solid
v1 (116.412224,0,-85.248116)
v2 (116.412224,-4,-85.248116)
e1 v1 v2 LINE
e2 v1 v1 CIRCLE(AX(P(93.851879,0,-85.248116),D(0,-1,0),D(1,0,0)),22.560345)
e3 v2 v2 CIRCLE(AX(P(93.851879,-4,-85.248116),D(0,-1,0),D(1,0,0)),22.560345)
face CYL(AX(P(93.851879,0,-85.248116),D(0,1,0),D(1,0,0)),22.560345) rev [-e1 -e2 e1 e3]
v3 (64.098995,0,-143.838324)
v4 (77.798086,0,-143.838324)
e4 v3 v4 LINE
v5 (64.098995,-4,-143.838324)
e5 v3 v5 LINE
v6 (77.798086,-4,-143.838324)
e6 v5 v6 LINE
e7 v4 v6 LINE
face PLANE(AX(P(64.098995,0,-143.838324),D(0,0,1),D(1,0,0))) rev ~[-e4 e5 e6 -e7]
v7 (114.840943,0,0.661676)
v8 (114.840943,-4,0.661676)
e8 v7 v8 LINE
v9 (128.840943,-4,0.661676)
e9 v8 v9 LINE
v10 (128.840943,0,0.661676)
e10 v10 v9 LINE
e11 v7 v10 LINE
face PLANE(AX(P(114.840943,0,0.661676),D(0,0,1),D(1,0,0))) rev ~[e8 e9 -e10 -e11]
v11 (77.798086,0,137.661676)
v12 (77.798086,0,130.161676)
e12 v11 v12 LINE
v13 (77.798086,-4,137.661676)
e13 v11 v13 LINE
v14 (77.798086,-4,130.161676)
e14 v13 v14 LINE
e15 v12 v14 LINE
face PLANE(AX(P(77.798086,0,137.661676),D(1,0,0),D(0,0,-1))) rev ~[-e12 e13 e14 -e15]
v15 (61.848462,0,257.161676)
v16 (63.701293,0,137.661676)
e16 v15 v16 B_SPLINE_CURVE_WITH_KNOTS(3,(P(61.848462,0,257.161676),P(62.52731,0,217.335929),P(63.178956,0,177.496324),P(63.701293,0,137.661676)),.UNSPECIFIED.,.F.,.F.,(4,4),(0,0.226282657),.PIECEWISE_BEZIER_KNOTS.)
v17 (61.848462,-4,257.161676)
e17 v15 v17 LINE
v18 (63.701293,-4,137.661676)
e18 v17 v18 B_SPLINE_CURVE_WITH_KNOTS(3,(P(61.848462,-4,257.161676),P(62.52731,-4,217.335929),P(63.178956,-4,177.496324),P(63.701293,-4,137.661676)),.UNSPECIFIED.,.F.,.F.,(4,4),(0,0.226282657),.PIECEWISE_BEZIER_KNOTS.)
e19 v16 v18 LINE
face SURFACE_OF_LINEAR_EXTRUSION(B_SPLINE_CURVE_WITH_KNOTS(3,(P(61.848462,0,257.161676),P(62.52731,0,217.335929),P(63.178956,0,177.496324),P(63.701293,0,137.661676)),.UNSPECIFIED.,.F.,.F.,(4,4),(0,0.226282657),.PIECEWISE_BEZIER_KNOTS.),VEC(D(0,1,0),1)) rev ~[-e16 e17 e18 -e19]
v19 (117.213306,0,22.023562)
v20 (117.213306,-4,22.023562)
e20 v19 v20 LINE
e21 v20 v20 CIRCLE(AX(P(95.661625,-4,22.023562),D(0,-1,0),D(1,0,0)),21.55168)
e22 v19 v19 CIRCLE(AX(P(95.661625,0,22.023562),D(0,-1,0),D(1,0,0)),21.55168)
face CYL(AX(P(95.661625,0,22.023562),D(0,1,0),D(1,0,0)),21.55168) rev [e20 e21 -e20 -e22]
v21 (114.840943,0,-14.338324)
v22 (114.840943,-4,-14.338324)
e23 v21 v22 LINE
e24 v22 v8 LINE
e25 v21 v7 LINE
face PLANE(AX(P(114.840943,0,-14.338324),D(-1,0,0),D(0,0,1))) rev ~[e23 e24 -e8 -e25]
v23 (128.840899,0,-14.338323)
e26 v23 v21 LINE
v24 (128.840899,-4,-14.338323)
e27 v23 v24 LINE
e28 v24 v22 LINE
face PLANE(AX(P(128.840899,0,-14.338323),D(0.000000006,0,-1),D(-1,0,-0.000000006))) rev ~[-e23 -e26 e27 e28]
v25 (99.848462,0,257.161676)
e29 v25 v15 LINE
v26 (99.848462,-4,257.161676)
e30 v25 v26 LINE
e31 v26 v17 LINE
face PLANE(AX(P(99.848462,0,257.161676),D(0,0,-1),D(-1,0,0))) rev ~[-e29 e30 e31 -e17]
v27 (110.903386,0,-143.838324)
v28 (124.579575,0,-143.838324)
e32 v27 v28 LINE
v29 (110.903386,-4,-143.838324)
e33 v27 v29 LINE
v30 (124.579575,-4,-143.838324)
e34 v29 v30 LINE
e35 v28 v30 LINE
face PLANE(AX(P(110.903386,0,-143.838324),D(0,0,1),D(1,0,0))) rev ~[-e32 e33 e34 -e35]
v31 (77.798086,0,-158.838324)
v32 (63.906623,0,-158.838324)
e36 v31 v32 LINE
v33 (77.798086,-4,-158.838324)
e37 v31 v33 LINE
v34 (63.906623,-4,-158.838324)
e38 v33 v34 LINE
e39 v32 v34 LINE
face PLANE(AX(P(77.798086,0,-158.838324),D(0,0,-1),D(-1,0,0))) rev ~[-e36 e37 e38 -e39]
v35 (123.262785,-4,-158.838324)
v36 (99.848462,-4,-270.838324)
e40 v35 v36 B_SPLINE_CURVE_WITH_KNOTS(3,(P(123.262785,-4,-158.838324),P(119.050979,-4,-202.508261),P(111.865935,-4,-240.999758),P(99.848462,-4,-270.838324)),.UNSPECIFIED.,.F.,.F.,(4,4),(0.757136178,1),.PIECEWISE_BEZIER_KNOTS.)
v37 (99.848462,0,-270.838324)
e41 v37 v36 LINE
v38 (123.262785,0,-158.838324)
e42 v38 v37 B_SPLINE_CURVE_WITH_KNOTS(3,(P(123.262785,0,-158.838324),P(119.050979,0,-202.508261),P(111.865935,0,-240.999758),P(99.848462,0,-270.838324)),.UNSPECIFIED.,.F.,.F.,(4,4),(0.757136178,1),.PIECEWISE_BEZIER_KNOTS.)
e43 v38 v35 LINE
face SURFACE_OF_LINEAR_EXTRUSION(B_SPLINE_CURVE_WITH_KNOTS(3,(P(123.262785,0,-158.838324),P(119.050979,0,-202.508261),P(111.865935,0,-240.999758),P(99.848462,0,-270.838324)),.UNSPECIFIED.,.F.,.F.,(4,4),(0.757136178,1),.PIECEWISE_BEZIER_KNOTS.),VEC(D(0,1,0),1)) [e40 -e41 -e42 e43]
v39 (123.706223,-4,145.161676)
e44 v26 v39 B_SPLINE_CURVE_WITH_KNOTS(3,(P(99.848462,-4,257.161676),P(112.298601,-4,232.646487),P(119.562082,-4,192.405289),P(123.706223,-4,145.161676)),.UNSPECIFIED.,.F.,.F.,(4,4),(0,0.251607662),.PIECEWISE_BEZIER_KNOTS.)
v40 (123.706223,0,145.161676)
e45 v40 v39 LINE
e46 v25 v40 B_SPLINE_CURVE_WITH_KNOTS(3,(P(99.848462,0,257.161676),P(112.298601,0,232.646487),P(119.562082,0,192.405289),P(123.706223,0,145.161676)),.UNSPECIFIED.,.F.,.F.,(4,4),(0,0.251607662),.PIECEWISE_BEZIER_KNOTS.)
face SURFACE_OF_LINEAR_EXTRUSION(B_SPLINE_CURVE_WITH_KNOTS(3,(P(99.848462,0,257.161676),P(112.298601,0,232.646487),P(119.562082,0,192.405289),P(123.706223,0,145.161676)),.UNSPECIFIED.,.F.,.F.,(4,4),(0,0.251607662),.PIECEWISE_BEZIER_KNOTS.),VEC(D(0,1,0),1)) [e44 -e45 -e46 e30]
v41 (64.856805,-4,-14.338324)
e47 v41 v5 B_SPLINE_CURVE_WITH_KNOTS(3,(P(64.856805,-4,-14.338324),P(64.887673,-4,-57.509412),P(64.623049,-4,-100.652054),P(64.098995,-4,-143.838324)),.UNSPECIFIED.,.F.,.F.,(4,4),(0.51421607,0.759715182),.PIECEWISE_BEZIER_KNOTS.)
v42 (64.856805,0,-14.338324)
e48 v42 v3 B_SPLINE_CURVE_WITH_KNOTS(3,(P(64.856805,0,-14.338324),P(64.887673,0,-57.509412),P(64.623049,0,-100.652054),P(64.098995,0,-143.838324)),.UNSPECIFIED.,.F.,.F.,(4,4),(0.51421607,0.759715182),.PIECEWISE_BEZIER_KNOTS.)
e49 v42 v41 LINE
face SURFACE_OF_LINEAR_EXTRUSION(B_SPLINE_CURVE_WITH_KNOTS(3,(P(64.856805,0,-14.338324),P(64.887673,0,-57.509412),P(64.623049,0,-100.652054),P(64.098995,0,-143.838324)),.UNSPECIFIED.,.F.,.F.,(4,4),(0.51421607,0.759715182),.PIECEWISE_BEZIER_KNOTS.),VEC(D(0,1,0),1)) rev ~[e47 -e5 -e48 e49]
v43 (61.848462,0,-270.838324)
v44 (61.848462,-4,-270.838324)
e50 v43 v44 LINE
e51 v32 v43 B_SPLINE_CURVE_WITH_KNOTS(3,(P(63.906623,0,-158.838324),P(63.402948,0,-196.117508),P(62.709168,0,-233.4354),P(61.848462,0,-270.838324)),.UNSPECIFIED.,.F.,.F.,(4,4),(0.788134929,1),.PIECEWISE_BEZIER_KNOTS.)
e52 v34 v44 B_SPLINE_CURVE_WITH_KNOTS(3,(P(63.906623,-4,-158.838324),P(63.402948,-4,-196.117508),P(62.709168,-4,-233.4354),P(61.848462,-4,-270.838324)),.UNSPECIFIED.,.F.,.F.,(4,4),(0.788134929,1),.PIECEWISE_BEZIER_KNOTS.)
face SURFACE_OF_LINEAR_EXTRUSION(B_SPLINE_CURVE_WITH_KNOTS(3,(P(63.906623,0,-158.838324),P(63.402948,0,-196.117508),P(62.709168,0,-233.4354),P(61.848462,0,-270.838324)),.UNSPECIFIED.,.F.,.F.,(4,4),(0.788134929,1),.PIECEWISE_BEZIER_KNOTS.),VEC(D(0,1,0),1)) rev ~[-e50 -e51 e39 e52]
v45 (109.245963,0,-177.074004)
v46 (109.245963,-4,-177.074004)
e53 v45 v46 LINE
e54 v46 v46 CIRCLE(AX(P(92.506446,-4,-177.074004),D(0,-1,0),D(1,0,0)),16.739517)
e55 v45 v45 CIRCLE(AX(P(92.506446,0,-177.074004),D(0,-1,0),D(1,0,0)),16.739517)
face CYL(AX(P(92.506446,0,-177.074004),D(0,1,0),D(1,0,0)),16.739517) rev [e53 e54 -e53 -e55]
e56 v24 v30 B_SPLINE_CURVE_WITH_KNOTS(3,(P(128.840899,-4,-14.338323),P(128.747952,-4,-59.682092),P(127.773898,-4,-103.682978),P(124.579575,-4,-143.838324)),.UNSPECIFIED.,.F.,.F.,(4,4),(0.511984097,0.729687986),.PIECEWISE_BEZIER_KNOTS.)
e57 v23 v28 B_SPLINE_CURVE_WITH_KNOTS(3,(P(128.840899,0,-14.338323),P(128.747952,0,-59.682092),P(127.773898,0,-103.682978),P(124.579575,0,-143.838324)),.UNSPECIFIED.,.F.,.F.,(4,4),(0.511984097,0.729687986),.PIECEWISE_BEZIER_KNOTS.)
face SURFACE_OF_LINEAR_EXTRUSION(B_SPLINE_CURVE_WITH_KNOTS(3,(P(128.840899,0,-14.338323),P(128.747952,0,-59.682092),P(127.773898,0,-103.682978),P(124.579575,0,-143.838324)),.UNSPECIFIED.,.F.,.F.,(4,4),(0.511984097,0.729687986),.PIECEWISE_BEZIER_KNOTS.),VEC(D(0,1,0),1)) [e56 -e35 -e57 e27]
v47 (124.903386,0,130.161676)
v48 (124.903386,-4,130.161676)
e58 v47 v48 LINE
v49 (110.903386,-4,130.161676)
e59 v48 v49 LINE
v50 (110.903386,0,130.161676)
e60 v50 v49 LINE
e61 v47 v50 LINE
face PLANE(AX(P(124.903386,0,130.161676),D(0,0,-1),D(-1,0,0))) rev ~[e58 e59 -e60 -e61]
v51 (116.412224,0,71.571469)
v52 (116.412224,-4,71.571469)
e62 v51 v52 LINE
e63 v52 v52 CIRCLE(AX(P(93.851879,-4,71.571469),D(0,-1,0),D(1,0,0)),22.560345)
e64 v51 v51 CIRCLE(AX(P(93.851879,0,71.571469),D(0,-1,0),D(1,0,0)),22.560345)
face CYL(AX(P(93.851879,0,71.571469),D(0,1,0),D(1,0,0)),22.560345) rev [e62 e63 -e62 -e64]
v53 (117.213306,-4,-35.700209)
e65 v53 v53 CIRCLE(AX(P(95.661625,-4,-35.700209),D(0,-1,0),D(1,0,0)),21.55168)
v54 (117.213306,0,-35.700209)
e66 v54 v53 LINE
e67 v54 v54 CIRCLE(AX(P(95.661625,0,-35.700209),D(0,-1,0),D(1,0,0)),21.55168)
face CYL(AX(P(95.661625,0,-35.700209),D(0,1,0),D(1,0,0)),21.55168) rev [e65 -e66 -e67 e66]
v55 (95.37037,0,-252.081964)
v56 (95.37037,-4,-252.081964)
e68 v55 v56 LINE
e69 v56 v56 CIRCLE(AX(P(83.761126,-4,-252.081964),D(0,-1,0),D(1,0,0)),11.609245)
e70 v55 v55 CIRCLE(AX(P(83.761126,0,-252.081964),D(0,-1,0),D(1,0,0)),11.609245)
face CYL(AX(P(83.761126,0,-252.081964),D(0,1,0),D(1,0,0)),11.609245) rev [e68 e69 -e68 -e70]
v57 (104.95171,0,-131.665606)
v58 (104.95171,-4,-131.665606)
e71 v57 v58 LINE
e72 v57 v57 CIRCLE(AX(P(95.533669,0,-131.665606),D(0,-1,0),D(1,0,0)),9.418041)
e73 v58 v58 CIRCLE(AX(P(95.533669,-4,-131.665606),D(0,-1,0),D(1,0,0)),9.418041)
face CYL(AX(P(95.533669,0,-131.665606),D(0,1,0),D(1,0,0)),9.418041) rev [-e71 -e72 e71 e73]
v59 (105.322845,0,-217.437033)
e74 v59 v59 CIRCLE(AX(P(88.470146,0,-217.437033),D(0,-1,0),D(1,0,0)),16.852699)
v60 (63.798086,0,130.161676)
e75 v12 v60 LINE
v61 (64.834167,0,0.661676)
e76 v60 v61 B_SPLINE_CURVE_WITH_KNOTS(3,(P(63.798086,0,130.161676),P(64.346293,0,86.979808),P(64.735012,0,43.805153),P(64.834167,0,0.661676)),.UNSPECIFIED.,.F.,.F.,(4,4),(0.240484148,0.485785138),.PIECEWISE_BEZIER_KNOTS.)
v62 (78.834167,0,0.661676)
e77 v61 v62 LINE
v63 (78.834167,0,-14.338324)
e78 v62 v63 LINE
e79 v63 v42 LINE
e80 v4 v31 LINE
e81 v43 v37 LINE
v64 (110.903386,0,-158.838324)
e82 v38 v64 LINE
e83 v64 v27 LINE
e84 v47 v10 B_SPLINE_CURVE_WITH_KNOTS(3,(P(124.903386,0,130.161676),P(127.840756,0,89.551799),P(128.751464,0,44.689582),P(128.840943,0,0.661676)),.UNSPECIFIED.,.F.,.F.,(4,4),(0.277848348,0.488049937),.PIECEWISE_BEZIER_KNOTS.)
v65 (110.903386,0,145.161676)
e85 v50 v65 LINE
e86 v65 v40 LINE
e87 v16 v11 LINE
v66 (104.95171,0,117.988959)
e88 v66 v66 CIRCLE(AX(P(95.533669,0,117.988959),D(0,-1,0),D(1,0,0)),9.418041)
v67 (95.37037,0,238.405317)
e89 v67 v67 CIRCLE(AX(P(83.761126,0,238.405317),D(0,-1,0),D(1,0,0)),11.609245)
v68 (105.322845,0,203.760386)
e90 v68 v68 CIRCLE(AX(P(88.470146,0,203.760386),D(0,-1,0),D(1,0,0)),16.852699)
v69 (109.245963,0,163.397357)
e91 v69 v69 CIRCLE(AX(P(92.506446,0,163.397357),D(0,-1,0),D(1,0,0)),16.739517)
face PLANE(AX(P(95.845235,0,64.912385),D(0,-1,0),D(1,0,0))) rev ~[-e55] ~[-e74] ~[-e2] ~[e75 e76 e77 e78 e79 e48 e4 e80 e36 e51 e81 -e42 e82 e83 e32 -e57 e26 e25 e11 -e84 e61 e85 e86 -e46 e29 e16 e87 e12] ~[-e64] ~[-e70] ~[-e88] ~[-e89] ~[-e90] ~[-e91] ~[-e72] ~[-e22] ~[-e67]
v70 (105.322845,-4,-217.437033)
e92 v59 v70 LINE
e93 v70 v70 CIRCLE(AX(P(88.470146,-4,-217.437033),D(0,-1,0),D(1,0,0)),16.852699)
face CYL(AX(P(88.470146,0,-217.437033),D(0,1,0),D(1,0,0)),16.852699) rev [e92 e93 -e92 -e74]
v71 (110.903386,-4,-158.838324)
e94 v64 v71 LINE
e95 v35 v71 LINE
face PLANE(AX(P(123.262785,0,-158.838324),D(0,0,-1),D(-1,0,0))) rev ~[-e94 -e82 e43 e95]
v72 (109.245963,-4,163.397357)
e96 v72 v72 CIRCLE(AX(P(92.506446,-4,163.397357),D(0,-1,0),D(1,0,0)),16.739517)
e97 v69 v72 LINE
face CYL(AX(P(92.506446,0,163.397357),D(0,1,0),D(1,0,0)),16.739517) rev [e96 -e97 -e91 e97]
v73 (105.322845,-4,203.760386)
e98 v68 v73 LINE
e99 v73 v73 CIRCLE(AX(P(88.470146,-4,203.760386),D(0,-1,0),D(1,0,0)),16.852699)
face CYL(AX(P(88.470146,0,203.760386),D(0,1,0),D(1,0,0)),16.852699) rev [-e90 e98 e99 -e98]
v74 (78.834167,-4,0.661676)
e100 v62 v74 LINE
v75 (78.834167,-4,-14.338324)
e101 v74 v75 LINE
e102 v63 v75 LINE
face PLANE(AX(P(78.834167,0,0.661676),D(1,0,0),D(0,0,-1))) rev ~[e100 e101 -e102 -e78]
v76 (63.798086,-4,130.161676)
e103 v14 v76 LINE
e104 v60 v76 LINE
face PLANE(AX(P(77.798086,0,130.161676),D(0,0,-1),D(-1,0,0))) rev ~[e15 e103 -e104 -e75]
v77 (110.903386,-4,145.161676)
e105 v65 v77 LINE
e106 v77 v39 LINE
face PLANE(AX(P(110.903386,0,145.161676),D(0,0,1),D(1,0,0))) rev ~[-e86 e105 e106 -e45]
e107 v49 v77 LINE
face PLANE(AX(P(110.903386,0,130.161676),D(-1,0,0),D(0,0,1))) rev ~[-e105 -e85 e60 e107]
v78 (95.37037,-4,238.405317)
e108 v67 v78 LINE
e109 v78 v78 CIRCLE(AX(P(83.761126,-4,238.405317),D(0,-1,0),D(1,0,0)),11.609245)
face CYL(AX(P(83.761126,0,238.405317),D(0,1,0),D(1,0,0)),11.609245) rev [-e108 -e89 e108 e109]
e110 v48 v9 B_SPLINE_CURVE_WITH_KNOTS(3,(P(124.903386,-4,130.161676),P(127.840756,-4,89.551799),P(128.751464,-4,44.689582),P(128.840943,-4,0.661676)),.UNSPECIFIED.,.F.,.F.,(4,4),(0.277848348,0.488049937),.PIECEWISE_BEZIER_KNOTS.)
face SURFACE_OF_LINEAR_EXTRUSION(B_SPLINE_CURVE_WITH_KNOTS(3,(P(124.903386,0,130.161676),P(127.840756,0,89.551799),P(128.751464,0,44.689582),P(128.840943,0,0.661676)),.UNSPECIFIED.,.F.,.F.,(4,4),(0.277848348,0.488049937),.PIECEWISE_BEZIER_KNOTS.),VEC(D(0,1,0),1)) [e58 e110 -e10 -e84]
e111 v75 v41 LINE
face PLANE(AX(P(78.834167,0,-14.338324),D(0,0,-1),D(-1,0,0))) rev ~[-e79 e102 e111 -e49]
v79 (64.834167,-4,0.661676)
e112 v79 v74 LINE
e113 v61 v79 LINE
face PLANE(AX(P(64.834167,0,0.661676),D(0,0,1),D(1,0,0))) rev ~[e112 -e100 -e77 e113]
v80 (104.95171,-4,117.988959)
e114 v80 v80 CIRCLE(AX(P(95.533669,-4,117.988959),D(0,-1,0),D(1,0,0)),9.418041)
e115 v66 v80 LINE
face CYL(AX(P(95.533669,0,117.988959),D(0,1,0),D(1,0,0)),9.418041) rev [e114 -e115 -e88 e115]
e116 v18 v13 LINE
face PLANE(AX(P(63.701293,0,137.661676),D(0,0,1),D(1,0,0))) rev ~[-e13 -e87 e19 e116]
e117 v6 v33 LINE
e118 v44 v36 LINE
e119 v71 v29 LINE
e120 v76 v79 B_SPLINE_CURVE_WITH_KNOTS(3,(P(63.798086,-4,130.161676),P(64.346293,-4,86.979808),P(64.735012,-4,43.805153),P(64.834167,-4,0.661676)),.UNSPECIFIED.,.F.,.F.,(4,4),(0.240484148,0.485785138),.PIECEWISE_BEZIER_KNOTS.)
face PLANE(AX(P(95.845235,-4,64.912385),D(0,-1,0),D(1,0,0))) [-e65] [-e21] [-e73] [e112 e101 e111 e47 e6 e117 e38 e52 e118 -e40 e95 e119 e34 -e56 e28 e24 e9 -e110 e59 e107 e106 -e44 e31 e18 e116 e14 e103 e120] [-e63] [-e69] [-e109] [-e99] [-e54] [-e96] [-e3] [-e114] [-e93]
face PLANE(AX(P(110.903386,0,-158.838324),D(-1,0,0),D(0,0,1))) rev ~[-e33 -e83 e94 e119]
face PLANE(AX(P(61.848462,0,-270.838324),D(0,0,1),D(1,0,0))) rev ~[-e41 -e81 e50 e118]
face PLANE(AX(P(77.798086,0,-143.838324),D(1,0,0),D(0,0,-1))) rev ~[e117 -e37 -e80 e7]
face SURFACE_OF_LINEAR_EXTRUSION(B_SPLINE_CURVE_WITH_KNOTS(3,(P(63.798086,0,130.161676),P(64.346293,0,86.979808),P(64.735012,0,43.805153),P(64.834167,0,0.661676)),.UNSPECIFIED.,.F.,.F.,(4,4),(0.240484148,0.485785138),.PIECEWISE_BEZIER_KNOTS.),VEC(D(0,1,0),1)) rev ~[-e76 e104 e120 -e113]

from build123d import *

# Parameters (mm, degrees)
F0_R     = 22.5603447523
F0_R_2   = 21.5516802716
F0_R_3   = 9.418040514
F0_R_4   = 16.7395174503
F0_R_5   = 11.6092445083
F0_R_6   = 16.8526987349
F1_DEPTH = 4


# Not quite as in the source:
# - ends of sketch curves that miss each other by under 0.0002 mm in the source are joined


with BuildPart() as f1:
    # F0 (on Front) → F1 (new body)
    with BuildSketch(Plane.XZ):
        with BuildLine():
            Line((78.8341670899, -6.8383235484), (114.8409428481, -6.8383235484))
            Line((114.8409428481, -6.8383235484), (114.8409428481, 0.6616764516))
            Line((114.8409428481, 0.6616764516), (128.8409428481, 0.6616764516))
            add(Edge.make_bspline(
                [(124.9033857451, 130.1616764516), (127.8407562373, 89.5517987134), (128.7514642032, 44.6895821219), (128.8409428481, 0.6616764516)],
                knots=[0.2778483476, 0.2778483476, 0.2778483476, 0.2778483476, 0.4880499366, 0.4880499366, 0.4880499366, 0.4880499366], degree=3))
            Line((124.9033857451, 130.1616764516), (110.9033857451, 130.1616764516))
            Line((110.9033857451, 130.1616764516), (110.9033857451, 137.6616764516))
            Line((110.9033857451, 137.6616764516), (77.7980855424, 137.6616764516))
            Line((77.7980855424, 137.6616764516), (77.7980855424, 130.1616764516))
            Line((77.7980855424, 130.1616764516), (63.7980855424, 130.1616764516))
            add(Edge.make_bspline(
                [(63.7980855424, 130.1616764516), (64.3462926476, 86.9798084925), (64.7350115683, 43.8051528282), (64.8341670899, 0.6616764516)],
                knots=[0.2404841481, 0.2404841481, 0.2404841481, 0.2404841481, 0.4857851385, 0.4857851385, 0.4857851385, 0.4857851385], degree=3))
            Line((64.8341670899, 0.6616764516), (78.8341670899, 0.6616764516))
            Line((78.8341670899, 0.6616764516), (78.8341670899, -6.8383235484))
        make_face()
        with Locations((93.8518792391, 71.5714693069)):
            Circle(F0_R, mode=Mode.SUBTRACT)
        with Locations((95.6616252661, 22.0235623419)):
            Circle(F0_R_2, mode=Mode.SUBTRACT)
        with Locations((95.5336689949, 117.9889589548)):
            Circle(F0_R_3, mode=Mode.SUBTRACT)
        with BuildLine():
            Line((110.9033857451, 145.1616764516), (123.7062231815, 145.1616764516))
            add(Edge.make_bspline(
                [(99.8484624624, 257.1616764516), (112.2986005896, 232.646487185), (119.5620823416, 192.4052892247), (123.7062231815, 145.1616764516)],
                knots=[0, 0, 0, 0, 0.2516076621, 0.2516076621, 0.2516076621, 0.2516076621], degree=3))
            Line((99.8484624624, 257.1616764516), (61.8484624624, 257.1616764516))
            add(Edge.make_bspline(
                [(61.8484624624, 257.1616764516), (62.5273104324, 217.3359288807), (63.1789559316, 177.4963243829), (63.701293151, 137.6616764516)],
                knots=[0, 0, 0, 0, 0.2262826567, 0.2262826567, 0.2262826567, 0.2262826567], degree=3))
            Line((63.701293151, 137.6616764516), (77.7980855424, 137.6616764516))
            Line((77.7980855424, 137.6616764516), (110.9033857451, 137.6616764516))
            Line((110.9033857451, 137.6616764516), (110.9033857451, 145.1616764516))
        make_face()
        with Locations((92.5064459443, 163.3973568678)):
            Circle(F0_R_4, mode=Mode.SUBTRACT)
        with Locations((83.761125803, 238.4053170681)):
            Circle(F0_R_5, mode=Mode.SUBTRACT)
        with Locations((88.47014606, 203.7603855133)):
            Circle(F0_R_6, mode=Mode.SUBTRACT)
        with BuildLine():
            Line((114.8409428481, -14.3383235484), (114.8409428481, -6.8383235484))
            Line((114.8409428481, -6.8383235484), (78.8341670899, -6.8383235484))
            Line((78.8341670899, -6.8383235484), (78.8341670899, -14.3383235484))
            Line((78.8341670899, -14.3383235484), (64.8568045286, -14.3383235484))
            add(Edge.make_bspline(
                [(64.8568045286, -14.3383235484), (64.8876732357, -57.5094122228), (64.6230490688, -100.6520537776), (64.0989954927, -143.8383235484)],
                knots=[0.51421607, 0.51421607, 0.51421607, 0.51421607, 0.7597151822, 0.7597151822, 0.7597151822, 0.7597151822], degree=3))
            Line((64.0989954927, -143.8383235484), (77.7980855424, -143.8383235484))
            Line((77.7980855424, -143.8383235484), (77.7980855424, -151.3383235484))
            Line((77.7980855424, -151.3383235484), (77.7980855424, -158.8383235484))
            Line((77.7980855424, -158.8383235484), (63.9066232608, -158.8383235484))
            add(Edge.make_bspline(
                [(63.9066232608, -158.8383235484), (63.4029478239, -196.117508426), (62.7091678723, -233.4354001086), (61.8484624624, -270.8383235484)],
                knots=[0.7881349295, 0.7881349295, 0.7881349295, 0.7881349295, 1, 1, 1, 1], degree=3))
            Line((61.8484624624, -270.8383235484), (99.8484624624, -270.8383235484))
            add(Edge.make_bspline(
                [(123.2627847104, -158.8383235484), (119.0509791243, -202.5082607649), (111.8659348538, -240.9997580131), (99.8484624624, -270.8383235484)],
                knots=[0.7571361778, 0.7571361778, 0.7571361778, 0.7571361778, 1, 1, 1, 1], degree=3))
            Line((123.2627847104, -158.8383235484), (110.9033857451, -158.8383235484))
            Line((110.9033857451, -158.8383235484), (110.9033857451, -151.3383235484))
            Line((110.9033857451, -151.3383235484), (110.9033857451, -143.8383235484))
            Line((110.9033857451, -143.8383235484), (124.5795751588, -143.8383235484))
            add(Edge.make_bspline(
                [(128.8408993214, -14.3383234592), (128.7479516437, -59.6820922187), (127.7738982193, -103.6829779906), (124.5795751588, -143.8383235484)],
                knots=[0.5119840968, 0.5119840968, 0.5119840968, 0.5119840968, 0.7296879862, 0.7296879862, 0.7296879862, 0.7296879862], degree=3))
            Line((128.8408993214, -14.3383234592), (114.8409428481, -14.3383235484))
        make_face()
        with Locations((83.761125803, -252.081964165)):
            Circle(F0_R_5, mode=Mode.SUBTRACT)
        with Locations((88.47014606, -217.4370326102)):
            Circle(F0_R_6, mode=Mode.SUBTRACT)
        with Locations((92.5064459443, -177.0740039647)):
            Circle(F0_R_4, mode=Mode.SUBTRACT)
        with Locations((93.8518792391, -85.2481164038)):
            Circle(F0_R, mode=Mode.SUBTRACT)
        with Locations((95.5336689949, -131.6656060517)):
            Circle(F0_R_3, mode=Mode.SUBTRACT)
        with Locations((95.6616252661, -35.7002094388)):
            Circle(F0_R_2, mode=Mode.SUBTRACT)
    extrude(amount=F1_DEPTH)


solid = f1.part
